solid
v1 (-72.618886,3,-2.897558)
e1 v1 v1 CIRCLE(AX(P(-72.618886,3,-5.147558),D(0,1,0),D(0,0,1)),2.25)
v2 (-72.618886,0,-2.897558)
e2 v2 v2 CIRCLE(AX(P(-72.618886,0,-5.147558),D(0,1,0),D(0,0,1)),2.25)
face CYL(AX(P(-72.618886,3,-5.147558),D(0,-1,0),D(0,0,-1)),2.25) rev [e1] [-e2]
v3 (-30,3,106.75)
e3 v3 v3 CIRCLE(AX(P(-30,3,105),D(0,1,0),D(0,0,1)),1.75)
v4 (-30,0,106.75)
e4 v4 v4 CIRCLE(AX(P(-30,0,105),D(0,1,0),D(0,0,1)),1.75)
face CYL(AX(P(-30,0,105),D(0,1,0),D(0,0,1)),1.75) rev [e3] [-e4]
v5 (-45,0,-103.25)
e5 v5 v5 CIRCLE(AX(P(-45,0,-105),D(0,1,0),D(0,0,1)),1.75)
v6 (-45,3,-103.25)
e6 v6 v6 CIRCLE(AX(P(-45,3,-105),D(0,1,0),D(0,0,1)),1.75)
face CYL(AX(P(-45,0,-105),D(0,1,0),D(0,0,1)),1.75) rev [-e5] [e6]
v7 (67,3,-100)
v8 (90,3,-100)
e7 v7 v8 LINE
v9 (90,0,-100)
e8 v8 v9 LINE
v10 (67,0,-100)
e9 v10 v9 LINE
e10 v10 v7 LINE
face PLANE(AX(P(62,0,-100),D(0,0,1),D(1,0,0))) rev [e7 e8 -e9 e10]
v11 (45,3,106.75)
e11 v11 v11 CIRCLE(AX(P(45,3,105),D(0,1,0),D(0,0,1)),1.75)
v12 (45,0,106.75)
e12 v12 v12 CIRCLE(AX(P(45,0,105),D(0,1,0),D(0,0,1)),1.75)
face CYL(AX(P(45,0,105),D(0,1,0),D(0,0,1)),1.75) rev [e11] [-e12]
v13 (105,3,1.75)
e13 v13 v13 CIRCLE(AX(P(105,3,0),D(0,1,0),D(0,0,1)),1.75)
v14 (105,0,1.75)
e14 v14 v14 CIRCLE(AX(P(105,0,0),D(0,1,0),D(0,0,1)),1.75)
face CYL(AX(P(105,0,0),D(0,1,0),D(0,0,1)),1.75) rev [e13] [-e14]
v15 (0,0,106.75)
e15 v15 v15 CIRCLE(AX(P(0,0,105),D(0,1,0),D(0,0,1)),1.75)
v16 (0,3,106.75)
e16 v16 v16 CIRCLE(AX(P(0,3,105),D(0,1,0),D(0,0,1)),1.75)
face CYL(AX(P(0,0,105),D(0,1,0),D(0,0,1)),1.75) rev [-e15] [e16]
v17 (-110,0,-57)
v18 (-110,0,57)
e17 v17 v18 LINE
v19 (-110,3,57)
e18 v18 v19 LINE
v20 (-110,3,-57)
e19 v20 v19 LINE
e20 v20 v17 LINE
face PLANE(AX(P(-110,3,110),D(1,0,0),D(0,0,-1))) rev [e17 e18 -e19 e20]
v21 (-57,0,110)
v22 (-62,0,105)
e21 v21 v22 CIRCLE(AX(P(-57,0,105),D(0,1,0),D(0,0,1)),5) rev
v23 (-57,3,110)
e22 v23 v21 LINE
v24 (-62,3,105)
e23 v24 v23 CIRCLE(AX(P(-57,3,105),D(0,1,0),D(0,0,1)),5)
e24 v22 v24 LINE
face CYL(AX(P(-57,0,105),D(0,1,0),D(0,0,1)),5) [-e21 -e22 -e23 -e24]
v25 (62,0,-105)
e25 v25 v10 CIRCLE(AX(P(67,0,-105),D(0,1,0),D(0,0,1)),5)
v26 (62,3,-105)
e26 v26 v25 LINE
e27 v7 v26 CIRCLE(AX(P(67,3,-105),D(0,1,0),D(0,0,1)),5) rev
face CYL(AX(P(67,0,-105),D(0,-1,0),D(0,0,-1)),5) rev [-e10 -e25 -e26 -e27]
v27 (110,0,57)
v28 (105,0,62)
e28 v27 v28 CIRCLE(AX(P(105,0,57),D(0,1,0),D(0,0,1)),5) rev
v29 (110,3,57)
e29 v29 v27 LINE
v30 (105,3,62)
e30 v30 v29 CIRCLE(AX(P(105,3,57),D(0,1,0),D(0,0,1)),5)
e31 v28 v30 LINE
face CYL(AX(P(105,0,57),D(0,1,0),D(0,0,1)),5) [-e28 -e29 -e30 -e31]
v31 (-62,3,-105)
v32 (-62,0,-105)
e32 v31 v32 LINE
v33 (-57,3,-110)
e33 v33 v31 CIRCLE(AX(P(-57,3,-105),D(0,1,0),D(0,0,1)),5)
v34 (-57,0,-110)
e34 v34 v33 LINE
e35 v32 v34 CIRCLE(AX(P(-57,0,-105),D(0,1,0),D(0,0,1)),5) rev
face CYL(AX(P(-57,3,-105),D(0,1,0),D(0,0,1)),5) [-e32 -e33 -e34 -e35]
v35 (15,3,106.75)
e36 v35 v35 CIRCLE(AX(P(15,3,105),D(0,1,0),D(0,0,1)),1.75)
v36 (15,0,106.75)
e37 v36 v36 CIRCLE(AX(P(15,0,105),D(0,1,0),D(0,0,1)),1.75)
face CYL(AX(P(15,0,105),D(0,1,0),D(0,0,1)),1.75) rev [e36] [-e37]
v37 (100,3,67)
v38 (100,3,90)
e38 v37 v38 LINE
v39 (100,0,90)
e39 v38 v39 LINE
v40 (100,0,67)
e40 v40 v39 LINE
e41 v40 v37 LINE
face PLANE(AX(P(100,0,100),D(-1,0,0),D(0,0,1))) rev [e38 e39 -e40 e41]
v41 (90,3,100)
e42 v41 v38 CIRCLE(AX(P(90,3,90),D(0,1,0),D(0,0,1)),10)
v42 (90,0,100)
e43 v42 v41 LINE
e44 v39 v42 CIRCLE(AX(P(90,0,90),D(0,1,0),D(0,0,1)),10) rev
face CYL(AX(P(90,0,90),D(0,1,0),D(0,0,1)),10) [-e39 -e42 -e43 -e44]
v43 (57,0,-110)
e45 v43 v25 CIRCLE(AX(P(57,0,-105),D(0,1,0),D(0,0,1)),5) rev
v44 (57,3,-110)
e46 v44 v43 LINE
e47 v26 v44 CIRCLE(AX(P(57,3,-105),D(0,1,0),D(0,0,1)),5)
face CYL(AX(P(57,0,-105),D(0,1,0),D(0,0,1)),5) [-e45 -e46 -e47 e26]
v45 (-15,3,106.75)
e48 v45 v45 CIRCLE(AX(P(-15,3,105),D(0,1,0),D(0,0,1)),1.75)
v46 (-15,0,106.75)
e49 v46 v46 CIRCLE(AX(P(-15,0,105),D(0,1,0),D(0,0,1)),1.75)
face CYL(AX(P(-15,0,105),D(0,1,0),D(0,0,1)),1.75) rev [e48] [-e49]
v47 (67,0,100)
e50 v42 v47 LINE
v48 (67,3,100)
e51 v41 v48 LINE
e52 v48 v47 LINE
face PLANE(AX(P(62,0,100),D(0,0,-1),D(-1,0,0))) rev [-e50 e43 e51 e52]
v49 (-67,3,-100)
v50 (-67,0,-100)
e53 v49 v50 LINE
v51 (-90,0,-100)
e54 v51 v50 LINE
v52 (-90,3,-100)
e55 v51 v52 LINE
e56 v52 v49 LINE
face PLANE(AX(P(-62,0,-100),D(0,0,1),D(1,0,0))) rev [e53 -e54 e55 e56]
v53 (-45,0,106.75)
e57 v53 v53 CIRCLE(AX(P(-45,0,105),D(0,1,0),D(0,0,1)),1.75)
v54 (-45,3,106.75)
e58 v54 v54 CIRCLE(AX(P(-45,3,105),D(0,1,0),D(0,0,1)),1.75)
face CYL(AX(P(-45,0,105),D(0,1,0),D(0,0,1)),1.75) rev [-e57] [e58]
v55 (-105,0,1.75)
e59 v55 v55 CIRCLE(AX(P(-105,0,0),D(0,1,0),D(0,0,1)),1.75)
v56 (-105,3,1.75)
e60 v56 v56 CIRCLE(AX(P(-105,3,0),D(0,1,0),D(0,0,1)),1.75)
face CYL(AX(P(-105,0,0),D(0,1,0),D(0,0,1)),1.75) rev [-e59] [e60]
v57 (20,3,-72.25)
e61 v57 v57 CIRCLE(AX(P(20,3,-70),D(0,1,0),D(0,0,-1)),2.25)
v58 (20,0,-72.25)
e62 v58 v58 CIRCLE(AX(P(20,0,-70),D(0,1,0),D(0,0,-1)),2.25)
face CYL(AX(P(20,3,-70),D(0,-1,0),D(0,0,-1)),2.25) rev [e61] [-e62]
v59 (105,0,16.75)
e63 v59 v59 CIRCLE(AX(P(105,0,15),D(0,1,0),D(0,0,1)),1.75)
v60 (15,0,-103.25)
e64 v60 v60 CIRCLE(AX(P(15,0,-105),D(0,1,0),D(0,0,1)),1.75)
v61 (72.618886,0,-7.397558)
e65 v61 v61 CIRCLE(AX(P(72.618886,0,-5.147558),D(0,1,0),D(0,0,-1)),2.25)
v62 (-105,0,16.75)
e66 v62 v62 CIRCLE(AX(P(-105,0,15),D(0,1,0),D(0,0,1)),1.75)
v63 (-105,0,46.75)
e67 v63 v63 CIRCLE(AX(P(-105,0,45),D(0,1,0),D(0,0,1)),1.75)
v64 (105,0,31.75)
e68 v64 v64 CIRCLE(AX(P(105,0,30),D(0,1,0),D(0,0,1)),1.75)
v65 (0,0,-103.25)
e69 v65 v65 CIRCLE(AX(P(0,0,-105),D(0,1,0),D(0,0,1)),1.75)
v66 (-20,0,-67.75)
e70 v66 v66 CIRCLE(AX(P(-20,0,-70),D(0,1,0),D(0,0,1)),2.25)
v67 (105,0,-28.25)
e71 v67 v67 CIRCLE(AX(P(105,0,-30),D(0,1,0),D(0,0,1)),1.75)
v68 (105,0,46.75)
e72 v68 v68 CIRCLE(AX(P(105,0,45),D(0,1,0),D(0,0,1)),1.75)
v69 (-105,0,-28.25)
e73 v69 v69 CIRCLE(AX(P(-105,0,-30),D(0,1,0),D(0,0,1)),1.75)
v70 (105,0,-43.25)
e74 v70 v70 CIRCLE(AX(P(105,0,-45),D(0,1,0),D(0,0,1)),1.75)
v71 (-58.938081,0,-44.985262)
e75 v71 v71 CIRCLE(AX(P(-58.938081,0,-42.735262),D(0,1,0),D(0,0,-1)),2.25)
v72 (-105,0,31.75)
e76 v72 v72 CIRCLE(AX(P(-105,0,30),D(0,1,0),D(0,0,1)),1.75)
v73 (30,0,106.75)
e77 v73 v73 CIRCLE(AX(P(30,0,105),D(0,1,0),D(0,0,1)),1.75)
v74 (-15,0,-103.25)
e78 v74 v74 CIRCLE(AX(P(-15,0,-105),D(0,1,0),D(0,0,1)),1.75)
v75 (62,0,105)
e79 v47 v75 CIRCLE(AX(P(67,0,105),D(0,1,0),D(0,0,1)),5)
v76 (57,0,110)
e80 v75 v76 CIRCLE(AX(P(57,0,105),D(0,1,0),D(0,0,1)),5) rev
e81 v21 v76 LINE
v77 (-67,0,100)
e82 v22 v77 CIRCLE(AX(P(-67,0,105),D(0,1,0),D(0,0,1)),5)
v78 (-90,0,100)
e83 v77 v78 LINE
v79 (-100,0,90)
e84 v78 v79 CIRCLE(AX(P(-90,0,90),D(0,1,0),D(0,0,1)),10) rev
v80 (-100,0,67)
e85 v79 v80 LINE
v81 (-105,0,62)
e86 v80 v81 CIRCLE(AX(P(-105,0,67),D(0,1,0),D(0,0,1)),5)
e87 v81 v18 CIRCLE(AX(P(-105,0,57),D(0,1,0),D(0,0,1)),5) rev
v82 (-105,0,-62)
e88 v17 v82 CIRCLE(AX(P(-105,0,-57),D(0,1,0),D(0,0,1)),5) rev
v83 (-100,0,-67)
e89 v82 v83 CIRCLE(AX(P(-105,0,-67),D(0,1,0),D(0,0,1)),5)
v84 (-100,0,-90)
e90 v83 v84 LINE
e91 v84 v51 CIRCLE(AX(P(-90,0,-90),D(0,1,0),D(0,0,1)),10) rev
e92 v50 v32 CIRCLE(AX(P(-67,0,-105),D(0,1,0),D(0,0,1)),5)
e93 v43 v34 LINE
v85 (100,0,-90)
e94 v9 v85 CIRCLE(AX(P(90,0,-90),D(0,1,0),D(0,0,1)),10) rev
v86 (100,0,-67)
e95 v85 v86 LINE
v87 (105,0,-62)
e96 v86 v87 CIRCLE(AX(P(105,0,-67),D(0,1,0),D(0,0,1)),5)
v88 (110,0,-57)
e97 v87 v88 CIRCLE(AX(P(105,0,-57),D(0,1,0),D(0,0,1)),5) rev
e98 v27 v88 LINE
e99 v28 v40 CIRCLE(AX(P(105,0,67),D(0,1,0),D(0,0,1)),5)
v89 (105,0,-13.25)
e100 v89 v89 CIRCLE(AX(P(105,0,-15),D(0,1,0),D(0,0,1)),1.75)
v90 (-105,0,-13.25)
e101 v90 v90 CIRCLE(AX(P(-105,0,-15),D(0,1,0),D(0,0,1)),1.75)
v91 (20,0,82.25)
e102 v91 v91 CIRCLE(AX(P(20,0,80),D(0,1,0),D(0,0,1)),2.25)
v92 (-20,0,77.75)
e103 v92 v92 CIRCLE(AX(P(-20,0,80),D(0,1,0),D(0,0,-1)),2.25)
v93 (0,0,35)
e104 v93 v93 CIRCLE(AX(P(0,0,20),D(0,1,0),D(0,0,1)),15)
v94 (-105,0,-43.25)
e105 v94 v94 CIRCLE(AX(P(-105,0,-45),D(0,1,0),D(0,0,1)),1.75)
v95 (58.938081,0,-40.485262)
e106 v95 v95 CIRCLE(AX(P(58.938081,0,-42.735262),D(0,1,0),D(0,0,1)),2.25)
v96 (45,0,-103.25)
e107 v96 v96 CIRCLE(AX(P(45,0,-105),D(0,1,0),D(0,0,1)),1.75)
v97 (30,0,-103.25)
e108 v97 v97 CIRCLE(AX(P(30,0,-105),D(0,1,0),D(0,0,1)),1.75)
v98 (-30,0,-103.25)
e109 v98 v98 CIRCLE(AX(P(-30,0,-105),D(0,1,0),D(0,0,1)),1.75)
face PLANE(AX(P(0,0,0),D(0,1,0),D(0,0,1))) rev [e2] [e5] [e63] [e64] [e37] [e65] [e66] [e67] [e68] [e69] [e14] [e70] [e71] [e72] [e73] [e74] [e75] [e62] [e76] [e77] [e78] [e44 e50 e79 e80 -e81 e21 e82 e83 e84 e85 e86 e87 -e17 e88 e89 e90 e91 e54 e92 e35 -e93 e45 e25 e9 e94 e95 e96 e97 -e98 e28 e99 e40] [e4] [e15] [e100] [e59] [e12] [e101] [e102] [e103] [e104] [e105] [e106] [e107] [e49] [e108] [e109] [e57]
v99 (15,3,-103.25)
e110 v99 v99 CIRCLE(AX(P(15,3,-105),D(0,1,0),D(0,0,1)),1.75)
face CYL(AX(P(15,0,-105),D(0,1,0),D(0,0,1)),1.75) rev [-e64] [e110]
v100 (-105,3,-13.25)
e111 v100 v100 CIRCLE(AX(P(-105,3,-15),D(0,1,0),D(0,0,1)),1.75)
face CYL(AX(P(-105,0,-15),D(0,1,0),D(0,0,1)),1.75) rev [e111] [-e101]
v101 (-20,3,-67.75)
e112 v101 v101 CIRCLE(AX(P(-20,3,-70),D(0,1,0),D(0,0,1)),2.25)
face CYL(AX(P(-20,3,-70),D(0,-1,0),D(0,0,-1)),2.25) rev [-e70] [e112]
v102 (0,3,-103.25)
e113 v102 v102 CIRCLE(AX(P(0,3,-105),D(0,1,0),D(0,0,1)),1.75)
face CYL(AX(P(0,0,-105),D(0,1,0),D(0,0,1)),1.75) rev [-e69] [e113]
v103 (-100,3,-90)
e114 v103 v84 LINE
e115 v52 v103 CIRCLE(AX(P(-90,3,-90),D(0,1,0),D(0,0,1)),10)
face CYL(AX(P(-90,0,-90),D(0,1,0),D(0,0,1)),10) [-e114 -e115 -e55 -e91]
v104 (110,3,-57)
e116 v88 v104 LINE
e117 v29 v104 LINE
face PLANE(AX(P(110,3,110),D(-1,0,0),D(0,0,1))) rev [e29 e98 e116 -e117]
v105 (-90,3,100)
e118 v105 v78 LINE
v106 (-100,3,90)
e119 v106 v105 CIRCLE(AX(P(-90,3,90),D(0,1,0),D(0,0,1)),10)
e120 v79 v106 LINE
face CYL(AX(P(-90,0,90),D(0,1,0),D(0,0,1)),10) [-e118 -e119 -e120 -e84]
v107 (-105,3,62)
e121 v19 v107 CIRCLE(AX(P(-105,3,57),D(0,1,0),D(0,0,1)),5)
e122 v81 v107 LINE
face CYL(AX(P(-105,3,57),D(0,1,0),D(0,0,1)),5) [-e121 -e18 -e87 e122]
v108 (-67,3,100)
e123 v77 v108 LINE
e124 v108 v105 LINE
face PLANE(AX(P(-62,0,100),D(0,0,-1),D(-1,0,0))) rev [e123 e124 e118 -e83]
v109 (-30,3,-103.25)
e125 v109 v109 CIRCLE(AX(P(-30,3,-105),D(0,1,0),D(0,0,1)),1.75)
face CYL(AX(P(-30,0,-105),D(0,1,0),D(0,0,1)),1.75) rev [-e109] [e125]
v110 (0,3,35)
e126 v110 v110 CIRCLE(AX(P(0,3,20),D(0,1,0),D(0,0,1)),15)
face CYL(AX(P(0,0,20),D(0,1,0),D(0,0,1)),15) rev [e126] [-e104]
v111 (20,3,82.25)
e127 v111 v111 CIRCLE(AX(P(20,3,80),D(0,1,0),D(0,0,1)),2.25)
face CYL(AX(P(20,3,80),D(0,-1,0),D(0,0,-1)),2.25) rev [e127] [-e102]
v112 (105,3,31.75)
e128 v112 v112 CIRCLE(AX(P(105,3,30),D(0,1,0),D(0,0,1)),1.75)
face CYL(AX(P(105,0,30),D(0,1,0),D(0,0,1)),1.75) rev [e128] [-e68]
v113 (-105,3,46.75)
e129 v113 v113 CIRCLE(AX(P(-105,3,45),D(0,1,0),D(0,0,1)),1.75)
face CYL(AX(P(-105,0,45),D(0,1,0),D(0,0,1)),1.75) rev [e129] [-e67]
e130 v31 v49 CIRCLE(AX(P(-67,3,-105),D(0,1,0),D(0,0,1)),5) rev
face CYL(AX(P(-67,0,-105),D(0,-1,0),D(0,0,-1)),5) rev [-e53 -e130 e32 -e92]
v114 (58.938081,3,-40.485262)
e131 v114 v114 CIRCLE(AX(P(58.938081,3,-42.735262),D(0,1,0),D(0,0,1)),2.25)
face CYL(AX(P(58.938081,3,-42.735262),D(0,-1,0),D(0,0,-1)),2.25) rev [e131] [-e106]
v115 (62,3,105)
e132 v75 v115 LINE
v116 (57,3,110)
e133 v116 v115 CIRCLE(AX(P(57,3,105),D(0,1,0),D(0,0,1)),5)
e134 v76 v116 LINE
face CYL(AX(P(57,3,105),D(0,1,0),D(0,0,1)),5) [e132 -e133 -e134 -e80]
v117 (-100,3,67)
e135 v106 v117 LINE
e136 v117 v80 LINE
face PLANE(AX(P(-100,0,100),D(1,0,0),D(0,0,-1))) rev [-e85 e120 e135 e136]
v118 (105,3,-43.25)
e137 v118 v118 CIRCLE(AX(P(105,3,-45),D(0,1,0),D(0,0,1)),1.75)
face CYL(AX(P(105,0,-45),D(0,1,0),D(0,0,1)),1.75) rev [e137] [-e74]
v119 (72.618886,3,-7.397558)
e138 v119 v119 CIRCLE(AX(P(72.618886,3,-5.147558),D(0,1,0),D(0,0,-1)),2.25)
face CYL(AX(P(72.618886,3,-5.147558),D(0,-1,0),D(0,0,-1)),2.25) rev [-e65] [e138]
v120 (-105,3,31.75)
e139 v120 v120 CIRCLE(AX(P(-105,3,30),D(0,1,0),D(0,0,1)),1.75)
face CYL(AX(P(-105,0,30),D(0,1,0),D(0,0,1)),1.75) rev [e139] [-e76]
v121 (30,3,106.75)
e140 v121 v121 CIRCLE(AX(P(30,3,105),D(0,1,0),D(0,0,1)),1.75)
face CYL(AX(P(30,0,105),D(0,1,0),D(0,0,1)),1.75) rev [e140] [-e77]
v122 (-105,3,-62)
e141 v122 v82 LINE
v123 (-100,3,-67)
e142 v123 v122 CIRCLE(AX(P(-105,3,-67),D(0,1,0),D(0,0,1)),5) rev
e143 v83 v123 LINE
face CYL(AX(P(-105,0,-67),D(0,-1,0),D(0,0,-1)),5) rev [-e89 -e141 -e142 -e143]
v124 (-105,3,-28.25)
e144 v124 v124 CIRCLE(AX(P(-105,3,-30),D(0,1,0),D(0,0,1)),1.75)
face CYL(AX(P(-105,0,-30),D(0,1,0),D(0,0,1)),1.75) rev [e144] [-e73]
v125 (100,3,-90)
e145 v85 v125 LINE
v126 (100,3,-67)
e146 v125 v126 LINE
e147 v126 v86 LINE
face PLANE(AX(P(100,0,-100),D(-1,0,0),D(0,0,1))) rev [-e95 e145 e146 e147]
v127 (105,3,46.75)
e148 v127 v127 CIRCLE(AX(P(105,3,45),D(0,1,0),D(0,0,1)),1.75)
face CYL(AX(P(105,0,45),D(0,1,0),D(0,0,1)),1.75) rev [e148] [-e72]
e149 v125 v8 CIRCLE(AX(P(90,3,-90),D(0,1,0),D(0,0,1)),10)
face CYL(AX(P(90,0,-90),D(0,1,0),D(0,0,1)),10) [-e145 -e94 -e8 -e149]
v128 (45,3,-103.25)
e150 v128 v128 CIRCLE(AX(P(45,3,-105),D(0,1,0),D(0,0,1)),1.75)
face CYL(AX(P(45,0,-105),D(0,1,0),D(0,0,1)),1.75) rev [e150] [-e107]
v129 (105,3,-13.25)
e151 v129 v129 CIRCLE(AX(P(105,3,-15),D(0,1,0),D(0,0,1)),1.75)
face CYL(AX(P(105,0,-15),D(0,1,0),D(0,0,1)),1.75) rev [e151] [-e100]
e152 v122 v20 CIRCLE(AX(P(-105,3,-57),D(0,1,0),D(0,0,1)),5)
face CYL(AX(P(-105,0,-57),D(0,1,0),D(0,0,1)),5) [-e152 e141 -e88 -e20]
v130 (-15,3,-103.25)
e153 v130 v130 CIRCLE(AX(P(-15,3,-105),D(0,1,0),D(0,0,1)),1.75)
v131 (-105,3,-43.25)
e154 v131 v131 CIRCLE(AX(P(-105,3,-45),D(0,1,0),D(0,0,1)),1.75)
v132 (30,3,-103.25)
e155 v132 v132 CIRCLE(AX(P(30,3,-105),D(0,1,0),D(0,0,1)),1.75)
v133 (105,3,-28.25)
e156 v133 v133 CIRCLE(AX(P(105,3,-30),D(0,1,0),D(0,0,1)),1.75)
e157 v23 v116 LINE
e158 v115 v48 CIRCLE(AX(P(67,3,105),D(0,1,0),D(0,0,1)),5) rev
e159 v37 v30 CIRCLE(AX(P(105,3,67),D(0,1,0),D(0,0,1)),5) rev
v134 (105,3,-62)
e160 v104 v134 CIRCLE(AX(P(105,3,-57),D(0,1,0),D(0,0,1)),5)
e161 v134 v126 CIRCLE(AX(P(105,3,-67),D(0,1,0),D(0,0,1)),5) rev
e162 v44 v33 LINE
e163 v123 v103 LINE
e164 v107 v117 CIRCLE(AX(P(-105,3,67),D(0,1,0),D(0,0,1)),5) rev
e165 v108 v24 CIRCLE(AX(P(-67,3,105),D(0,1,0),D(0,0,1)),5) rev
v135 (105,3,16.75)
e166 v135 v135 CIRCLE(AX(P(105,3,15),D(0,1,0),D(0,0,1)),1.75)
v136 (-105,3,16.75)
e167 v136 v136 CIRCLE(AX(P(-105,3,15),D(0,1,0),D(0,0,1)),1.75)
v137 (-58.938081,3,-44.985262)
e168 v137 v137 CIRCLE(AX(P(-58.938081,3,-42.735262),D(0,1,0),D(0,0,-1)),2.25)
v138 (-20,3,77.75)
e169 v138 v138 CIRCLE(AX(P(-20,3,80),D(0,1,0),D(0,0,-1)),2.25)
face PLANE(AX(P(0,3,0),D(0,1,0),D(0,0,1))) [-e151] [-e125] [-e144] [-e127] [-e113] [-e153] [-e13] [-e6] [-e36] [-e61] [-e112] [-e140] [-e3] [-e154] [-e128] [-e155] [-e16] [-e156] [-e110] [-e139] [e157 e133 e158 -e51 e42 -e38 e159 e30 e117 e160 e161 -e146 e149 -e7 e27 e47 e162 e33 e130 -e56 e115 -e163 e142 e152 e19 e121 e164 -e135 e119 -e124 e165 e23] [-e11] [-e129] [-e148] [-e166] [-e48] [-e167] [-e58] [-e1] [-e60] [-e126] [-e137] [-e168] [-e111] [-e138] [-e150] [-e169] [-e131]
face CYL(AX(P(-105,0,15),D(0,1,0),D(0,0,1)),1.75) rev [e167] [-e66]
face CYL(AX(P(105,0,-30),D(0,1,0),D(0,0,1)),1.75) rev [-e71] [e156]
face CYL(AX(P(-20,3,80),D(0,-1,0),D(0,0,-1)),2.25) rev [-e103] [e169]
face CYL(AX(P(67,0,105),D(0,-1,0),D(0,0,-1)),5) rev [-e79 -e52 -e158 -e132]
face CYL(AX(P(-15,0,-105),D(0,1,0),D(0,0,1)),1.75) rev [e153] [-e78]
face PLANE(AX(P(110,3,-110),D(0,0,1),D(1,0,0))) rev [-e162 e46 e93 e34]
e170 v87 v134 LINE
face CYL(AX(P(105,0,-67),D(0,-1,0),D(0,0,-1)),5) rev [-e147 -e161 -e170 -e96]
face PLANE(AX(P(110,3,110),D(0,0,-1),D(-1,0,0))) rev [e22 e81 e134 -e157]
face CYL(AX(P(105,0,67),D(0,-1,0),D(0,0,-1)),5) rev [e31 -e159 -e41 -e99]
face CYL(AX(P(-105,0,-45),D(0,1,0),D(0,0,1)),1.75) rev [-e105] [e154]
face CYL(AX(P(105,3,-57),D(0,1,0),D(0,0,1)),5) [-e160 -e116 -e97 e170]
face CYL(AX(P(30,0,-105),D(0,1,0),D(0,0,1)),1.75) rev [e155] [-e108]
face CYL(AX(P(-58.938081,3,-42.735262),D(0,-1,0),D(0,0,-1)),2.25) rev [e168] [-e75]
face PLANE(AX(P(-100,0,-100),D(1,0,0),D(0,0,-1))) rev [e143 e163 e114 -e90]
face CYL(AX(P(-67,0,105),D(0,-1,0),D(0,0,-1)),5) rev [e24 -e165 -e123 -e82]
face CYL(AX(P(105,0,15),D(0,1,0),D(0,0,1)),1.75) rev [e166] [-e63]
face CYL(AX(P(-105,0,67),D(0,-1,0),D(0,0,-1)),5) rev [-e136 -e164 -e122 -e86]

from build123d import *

# Parameters (mm, degrees)
SKETCH_1_W          = 220
SKETCH_1_H          = 220
SKETCH_1_R          = 2.25
EXTRUDE_1_DEPTH     = 3
CUT_EXTRUDE_1_DEPTH = 156.592416268
FILLET_1_R          = 10
FILLET_START        = -1
FILLET_2_DEPTH      = 5
FILLET_2_2_DEPTH    = 3
SKETCH_4_R          = 1.75
CUT_EXTRUDE_2_DEPTH = 156.592416268
SKETCH1_R           = 15
CUT_EXTRUDE1_DEPTH  = 156.592416268


with BuildPart() as part:
    # Эскиз1 → Бобышка-Вытянуть1 (new body)
    with BuildSketch(Plane(origin=(0, 0, 0), x_dir=(1, 0, 0), z_dir=(0, 1, 0))):
        Rectangle(SKETCH_1_W, SKETCH_1_H)
        with Locations(Location((-20, 70, 0), (0, 0, 270))):
            Circle(SKETCH_1_R, mode=Mode.SUBTRACT)
        with Locations(Location((20, 70, 0), (0, 0, 90))):
            Circle(SKETCH_1_R, mode=Mode.SUBTRACT)
        with Locations(Location((-20, -80, 0), (0, 0, 90))):
            Circle(SKETCH_1_R, mode=Mode.SUBTRACT)
        with Locations(Location((20, -80, 0), (0, 0, 270))):
            Circle(SKETCH_1_R, mode=Mode.SUBTRACT)
        with Locations(Location((58.938080589, 42.735262449, 0), (0, 0, 270))):
            Circle(SKETCH_1_R, mode=Mode.SUBTRACT)
        with Locations(Location((72.618886322, 5.147557617, 0), (0, 0, 90))):
            Circle(SKETCH_1_R, mode=Mode.SUBTRACT)
        with Locations(Location((-72.618886322, 5.147557617, 0), (0, 0, 270))):
            Circle(SKETCH_1_R, mode=Mode.SUBTRACT)
        with Locations(Location((-58.938080589, 42.735262449, 0), (0, 0, 90))):
            Circle(SKETCH_1_R, mode=Mode.SUBTRACT)
    extrude(amount=EXTRUDE_1_DEPTH)

    # Эскиз3 → Вырез-Вытянуть1 (cut, through all)
    with BuildSketch(Plane(origin=(0, 3, 0), x_dir=(1, 0, 0), z_dir=(0, 1, 0))):
        Polygon((-110, 110), (-62, 110), (-62, 100), (-100, 100), (-100, 62), (-110, 62), align=None)
        Polygon((110, 62), (110, 110), (62, 110), (62, 100), (100, 100), (100, 62), align=None)
        Polygon((110, -110), (62, -110), (62, -100), (100, -100), (100, -62), (110, -62), align=None)
        Polygon((-110, -62), (-110, -110), (-62, -110), (-62, -100), (-100, -100), (-100, -62), align=None)
    extrude(amount=-CUT_EXTRUDE_1_DEPTH, mode=Mode.SUBTRACT)

    # Скругление1
    fillet_1_edges = [part.edges().sort_by_distance(p)[0] for p in [
        (-100, 1.5, 100),
        (100, 1.5, 100),
        (100, 1.5, -100),
        (-100, 1.5, -100),
    ]]
    fillet(fillet_1_edges, radius=FILLET_1_R)

    # Скругление2: read off the stored shape, not the designer's step
    # Скругление2 outline → Скругление2 (cut)
    with BuildSketch(Plane(origin=(0, 0, 0), x_dir=(1, 0, 0), z_dir=(0, 1, 0)).offset(FILLET_START)):
        with BuildLine():
            ThreePointArc((-105, -62), (-108.535533906, -60.535533906), (-110, -57))
            Line((-110, -57), (-110, -62))
            Line((-110, -62), (-105, -62))
        make_face()
        with BuildLine():
            ThreePointArc((-110, 57), (-108.535533906, 60.535533906), (-105, 62))
            Line((-105, 62), (-110, 62))
            Line((-110, 62), (-110, 57))
        make_face()
        with BuildLine():
            Line((62, 110), (57, 110))
            ThreePointArc((57, 110), (60.535533906, 108.535533906), (62, 105))
            Line((62, 105), (62, 110))
        make_face()
        with BuildLine():
            ThreePointArc((-62, 105), (-60.535533906, 108.535533906), (-57, 110))
            Line((-57, 110), (-62, 110))
            Line((-62, 110), (-62, 105))
        make_face()
        with BuildLine():
            ThreePointArc((62, -105), (60.535533906, -108.535533906), (57, -110))
            Line((57, -110), (62, -110))
            Line((62, -110), (62, -105))
        make_face()
        with BuildLine():
            ThreePointArc((-57, -110), (-60.535533906, -108.535533906), (-62, -105))
            Line((-62, -105), (-62, -110))
            Line((-62, -110), (-57, -110))
        make_face()
        with BuildLine():
            ThreePointArc((105, 62), (108.535533906, 60.535533906), (110, 57))
            Line((110, 57), (110, 62))
            Line((110, 62), (105, 62))
        make_face()
        with BuildLine():
            ThreePointArc((110, -57), (108.535533906, -60.535533906), (105, -62))
            Line((105, -62), (110, -62))
            Line((110, -62), (110, -57))
        make_face()
    extrude(amount=FILLET_2_DEPTH, mode=Mode.SUBTRACT)

    # Fillet 2 2 outline → Fillet 2 2 (add)
    with BuildSketch(Plane(origin=(0, 0, 0), x_dir=(1, 0, 0), z_dir=(0, 1, 0))):
        with BuildLine():
            Line((-100, 62), (-100, 67))
            ThreePointArc((-100, 67), (-101.464466094, 63.464466094), (-105, 62))
            Line((-105, 62), (-100, 62))
        make_face()
        with BuildLine():
            Line((-100, -62), (-105, -62))
            ThreePointArc((-105, -62), (-101.464466094, -63.464466094), (-100, -67))
            Line((-100, -67), (-100, -62))
        make_face()
        with BuildLine():
            Line((-62, 100), (-62, 105))
            ThreePointArc((-62, 105), (-63.464466094, 101.464466094), (-67, 100))
            Line((-67, 100), (-62, 100))
        make_face()
        with BuildLine():
            ThreePointArc((67, 100), (63.464466094, 101.464466094), (62, 105))
            Line((62, 105), (62, 100))
            Line((62, 100), (67, 100))
        make_face()
        with BuildLine():
            Line((62, -100), (62, -105))
            ThreePointArc((62, -105), (63.464466094, -101.464466094), (67, -100))
            Line((67, -100), (62, -100))
        make_face()
        with BuildLine():
            ThreePointArc((-67, -100), (-63.464466094, -101.464466094), (-62, -105))
            Line((-62, -105), (-62, -100))
            Line((-62, -100), (-67, -100))
        make_face()
        with BuildLine():
            Line((100, 62), (105, 62))
            ThreePointArc((105, 62), (101.464466094, 63.464466094), (100, 67))
            Line((100, 67), (100, 62))
        make_face()
        with BuildLine():
            ThreePointArc((100, -67), (101.464466094, -63.464466094), (105, -62))
            Line((105, -62), (100, -62))
            Line((100, -62), (100, -67))
        make_face()
    extrude(amount=FILLET_2_2_DEPTH)

    # Эскиз4 → Вырез-Вытянуть2 (cut, through all)
    with BuildSketch(Plane(origin=(0, 3, 0), x_dir=(1, 0, 0), z_dir=(0, 1, 0))):
        with Locations(Location((0, 105, 0), (0, 0, 270))):
            Circle(SKETCH_4_R)
        with Locations(Location((15, 105, 0), (0, 0, 270))):
            Circle(SKETCH_4_R)
        with Locations(Location((30, 105, 0), (0, 0, 270))):
            Circle(SKETCH_4_R)
        with Locations(Location((45, 105, 0), (0, 0, 270))):
            Circle(SKETCH_4_R)
        with Locations(Location((-15, 105, 0), (0, 0, 270))):
            Circle(SKETCH_4_R)
        with Locations(Location((-30, 105, 0), (0, 0, 270))):
            Circle(SKETCH_4_R)
        with Locations(Location((-45, 105, 0), (0, 0, 270))):
            Circle(SKETCH_4_R)
        with Locations(Location((105, 0, 0), (0, 0, 270))):
            Circle(SKETCH_4_R)
        with Locations(Location((105, -15, 0), (0, 0, 270))):
            Circle(SKETCH_4_R)
        with Locations(Location((105, -30, 0), (0, 0, 270))):
            Circle(SKETCH_4_R)
        with Locations(Location((105, -45, 0), (0, 0, 270))):
            Circle(SKETCH_4_R)
        with Locations(Location((105, 15, 0), (0, 0, 270))):
            Circle(SKETCH_4_R)
        with Locations(Location((105, 30, 0), (0, 0, 270))):
            Circle(SKETCH_4_R)
        with Locations(Location((105, 45, 0), (0, 0, 270))):
            Circle(SKETCH_4_R)
        with Locations(Location((0, -105, 0), (0, 0, 270))):
            Circle(SKETCH_4_R)
        with Locations(Location((-15, -105, 0), (0, 0, 270))):
            Circle(SKETCH_4_R)
        with Locations(Location((-30, -105, 0), (0, 0, 270))):
            Circle(SKETCH_4_R)
        with Locations(Location((-45, -105, 0), (0, 0, 270))):
            Circle(SKETCH_4_R)
        with Locations(Location((15, -105, 0), (0, 0, 270))):
            Circle(SKETCH_4_R)
        with Locations(Location((30, -105, 0), (0, 0, 270))):
            Circle(SKETCH_4_R)
        with Locations(Location((45, -105, 0), (0, 0, 270))):
            Circle(SKETCH_4_R)
        with Locations(Location((-105, 0, 0), (0, 0, 270))):
            Circle(SKETCH_4_R)
        with Locations(Location((-105, 15, 0), (0, 0, 270))):
            Circle(SKETCH_4_R)
        with Locations(Location((-105, 30, 0), (0, 0, 270))):
            Circle(SKETCH_4_R)
        with Locations(Location((-105, 45, 0), (0, 0, 270))):
            Circle(SKETCH_4_R)
        with Locations(Location((-105, -15, 0), (0, 0, 270))):
            Circle(SKETCH_4_R)
        with Locations(Location((-105, -30, 0), (0, 0, 270))):
            Circle(SKETCH_4_R)
        with Locations(Location((-105, -45, 0), (0, 0, 270))):
            Circle(SKETCH_4_R)
    extrude(amount=-CUT_EXTRUDE_2_DEPTH, mode=Mode.SUBTRACT)

    # Sketch1 → Cut-Extrude1 (cut, through all)
    with BuildSketch(Plane(origin=(0, 3, 0), x_dir=(1, 0, 0), z_dir=(0, 1, 0))):
        with Locations(Location((0, -20, 0), (0, 0, 270))):
            Circle(SKETCH1_R)
    extrude(amount=-CUT_EXTRUDE1_DEPTH, mode=Mode.SUBTRACT)


solid = part.part
